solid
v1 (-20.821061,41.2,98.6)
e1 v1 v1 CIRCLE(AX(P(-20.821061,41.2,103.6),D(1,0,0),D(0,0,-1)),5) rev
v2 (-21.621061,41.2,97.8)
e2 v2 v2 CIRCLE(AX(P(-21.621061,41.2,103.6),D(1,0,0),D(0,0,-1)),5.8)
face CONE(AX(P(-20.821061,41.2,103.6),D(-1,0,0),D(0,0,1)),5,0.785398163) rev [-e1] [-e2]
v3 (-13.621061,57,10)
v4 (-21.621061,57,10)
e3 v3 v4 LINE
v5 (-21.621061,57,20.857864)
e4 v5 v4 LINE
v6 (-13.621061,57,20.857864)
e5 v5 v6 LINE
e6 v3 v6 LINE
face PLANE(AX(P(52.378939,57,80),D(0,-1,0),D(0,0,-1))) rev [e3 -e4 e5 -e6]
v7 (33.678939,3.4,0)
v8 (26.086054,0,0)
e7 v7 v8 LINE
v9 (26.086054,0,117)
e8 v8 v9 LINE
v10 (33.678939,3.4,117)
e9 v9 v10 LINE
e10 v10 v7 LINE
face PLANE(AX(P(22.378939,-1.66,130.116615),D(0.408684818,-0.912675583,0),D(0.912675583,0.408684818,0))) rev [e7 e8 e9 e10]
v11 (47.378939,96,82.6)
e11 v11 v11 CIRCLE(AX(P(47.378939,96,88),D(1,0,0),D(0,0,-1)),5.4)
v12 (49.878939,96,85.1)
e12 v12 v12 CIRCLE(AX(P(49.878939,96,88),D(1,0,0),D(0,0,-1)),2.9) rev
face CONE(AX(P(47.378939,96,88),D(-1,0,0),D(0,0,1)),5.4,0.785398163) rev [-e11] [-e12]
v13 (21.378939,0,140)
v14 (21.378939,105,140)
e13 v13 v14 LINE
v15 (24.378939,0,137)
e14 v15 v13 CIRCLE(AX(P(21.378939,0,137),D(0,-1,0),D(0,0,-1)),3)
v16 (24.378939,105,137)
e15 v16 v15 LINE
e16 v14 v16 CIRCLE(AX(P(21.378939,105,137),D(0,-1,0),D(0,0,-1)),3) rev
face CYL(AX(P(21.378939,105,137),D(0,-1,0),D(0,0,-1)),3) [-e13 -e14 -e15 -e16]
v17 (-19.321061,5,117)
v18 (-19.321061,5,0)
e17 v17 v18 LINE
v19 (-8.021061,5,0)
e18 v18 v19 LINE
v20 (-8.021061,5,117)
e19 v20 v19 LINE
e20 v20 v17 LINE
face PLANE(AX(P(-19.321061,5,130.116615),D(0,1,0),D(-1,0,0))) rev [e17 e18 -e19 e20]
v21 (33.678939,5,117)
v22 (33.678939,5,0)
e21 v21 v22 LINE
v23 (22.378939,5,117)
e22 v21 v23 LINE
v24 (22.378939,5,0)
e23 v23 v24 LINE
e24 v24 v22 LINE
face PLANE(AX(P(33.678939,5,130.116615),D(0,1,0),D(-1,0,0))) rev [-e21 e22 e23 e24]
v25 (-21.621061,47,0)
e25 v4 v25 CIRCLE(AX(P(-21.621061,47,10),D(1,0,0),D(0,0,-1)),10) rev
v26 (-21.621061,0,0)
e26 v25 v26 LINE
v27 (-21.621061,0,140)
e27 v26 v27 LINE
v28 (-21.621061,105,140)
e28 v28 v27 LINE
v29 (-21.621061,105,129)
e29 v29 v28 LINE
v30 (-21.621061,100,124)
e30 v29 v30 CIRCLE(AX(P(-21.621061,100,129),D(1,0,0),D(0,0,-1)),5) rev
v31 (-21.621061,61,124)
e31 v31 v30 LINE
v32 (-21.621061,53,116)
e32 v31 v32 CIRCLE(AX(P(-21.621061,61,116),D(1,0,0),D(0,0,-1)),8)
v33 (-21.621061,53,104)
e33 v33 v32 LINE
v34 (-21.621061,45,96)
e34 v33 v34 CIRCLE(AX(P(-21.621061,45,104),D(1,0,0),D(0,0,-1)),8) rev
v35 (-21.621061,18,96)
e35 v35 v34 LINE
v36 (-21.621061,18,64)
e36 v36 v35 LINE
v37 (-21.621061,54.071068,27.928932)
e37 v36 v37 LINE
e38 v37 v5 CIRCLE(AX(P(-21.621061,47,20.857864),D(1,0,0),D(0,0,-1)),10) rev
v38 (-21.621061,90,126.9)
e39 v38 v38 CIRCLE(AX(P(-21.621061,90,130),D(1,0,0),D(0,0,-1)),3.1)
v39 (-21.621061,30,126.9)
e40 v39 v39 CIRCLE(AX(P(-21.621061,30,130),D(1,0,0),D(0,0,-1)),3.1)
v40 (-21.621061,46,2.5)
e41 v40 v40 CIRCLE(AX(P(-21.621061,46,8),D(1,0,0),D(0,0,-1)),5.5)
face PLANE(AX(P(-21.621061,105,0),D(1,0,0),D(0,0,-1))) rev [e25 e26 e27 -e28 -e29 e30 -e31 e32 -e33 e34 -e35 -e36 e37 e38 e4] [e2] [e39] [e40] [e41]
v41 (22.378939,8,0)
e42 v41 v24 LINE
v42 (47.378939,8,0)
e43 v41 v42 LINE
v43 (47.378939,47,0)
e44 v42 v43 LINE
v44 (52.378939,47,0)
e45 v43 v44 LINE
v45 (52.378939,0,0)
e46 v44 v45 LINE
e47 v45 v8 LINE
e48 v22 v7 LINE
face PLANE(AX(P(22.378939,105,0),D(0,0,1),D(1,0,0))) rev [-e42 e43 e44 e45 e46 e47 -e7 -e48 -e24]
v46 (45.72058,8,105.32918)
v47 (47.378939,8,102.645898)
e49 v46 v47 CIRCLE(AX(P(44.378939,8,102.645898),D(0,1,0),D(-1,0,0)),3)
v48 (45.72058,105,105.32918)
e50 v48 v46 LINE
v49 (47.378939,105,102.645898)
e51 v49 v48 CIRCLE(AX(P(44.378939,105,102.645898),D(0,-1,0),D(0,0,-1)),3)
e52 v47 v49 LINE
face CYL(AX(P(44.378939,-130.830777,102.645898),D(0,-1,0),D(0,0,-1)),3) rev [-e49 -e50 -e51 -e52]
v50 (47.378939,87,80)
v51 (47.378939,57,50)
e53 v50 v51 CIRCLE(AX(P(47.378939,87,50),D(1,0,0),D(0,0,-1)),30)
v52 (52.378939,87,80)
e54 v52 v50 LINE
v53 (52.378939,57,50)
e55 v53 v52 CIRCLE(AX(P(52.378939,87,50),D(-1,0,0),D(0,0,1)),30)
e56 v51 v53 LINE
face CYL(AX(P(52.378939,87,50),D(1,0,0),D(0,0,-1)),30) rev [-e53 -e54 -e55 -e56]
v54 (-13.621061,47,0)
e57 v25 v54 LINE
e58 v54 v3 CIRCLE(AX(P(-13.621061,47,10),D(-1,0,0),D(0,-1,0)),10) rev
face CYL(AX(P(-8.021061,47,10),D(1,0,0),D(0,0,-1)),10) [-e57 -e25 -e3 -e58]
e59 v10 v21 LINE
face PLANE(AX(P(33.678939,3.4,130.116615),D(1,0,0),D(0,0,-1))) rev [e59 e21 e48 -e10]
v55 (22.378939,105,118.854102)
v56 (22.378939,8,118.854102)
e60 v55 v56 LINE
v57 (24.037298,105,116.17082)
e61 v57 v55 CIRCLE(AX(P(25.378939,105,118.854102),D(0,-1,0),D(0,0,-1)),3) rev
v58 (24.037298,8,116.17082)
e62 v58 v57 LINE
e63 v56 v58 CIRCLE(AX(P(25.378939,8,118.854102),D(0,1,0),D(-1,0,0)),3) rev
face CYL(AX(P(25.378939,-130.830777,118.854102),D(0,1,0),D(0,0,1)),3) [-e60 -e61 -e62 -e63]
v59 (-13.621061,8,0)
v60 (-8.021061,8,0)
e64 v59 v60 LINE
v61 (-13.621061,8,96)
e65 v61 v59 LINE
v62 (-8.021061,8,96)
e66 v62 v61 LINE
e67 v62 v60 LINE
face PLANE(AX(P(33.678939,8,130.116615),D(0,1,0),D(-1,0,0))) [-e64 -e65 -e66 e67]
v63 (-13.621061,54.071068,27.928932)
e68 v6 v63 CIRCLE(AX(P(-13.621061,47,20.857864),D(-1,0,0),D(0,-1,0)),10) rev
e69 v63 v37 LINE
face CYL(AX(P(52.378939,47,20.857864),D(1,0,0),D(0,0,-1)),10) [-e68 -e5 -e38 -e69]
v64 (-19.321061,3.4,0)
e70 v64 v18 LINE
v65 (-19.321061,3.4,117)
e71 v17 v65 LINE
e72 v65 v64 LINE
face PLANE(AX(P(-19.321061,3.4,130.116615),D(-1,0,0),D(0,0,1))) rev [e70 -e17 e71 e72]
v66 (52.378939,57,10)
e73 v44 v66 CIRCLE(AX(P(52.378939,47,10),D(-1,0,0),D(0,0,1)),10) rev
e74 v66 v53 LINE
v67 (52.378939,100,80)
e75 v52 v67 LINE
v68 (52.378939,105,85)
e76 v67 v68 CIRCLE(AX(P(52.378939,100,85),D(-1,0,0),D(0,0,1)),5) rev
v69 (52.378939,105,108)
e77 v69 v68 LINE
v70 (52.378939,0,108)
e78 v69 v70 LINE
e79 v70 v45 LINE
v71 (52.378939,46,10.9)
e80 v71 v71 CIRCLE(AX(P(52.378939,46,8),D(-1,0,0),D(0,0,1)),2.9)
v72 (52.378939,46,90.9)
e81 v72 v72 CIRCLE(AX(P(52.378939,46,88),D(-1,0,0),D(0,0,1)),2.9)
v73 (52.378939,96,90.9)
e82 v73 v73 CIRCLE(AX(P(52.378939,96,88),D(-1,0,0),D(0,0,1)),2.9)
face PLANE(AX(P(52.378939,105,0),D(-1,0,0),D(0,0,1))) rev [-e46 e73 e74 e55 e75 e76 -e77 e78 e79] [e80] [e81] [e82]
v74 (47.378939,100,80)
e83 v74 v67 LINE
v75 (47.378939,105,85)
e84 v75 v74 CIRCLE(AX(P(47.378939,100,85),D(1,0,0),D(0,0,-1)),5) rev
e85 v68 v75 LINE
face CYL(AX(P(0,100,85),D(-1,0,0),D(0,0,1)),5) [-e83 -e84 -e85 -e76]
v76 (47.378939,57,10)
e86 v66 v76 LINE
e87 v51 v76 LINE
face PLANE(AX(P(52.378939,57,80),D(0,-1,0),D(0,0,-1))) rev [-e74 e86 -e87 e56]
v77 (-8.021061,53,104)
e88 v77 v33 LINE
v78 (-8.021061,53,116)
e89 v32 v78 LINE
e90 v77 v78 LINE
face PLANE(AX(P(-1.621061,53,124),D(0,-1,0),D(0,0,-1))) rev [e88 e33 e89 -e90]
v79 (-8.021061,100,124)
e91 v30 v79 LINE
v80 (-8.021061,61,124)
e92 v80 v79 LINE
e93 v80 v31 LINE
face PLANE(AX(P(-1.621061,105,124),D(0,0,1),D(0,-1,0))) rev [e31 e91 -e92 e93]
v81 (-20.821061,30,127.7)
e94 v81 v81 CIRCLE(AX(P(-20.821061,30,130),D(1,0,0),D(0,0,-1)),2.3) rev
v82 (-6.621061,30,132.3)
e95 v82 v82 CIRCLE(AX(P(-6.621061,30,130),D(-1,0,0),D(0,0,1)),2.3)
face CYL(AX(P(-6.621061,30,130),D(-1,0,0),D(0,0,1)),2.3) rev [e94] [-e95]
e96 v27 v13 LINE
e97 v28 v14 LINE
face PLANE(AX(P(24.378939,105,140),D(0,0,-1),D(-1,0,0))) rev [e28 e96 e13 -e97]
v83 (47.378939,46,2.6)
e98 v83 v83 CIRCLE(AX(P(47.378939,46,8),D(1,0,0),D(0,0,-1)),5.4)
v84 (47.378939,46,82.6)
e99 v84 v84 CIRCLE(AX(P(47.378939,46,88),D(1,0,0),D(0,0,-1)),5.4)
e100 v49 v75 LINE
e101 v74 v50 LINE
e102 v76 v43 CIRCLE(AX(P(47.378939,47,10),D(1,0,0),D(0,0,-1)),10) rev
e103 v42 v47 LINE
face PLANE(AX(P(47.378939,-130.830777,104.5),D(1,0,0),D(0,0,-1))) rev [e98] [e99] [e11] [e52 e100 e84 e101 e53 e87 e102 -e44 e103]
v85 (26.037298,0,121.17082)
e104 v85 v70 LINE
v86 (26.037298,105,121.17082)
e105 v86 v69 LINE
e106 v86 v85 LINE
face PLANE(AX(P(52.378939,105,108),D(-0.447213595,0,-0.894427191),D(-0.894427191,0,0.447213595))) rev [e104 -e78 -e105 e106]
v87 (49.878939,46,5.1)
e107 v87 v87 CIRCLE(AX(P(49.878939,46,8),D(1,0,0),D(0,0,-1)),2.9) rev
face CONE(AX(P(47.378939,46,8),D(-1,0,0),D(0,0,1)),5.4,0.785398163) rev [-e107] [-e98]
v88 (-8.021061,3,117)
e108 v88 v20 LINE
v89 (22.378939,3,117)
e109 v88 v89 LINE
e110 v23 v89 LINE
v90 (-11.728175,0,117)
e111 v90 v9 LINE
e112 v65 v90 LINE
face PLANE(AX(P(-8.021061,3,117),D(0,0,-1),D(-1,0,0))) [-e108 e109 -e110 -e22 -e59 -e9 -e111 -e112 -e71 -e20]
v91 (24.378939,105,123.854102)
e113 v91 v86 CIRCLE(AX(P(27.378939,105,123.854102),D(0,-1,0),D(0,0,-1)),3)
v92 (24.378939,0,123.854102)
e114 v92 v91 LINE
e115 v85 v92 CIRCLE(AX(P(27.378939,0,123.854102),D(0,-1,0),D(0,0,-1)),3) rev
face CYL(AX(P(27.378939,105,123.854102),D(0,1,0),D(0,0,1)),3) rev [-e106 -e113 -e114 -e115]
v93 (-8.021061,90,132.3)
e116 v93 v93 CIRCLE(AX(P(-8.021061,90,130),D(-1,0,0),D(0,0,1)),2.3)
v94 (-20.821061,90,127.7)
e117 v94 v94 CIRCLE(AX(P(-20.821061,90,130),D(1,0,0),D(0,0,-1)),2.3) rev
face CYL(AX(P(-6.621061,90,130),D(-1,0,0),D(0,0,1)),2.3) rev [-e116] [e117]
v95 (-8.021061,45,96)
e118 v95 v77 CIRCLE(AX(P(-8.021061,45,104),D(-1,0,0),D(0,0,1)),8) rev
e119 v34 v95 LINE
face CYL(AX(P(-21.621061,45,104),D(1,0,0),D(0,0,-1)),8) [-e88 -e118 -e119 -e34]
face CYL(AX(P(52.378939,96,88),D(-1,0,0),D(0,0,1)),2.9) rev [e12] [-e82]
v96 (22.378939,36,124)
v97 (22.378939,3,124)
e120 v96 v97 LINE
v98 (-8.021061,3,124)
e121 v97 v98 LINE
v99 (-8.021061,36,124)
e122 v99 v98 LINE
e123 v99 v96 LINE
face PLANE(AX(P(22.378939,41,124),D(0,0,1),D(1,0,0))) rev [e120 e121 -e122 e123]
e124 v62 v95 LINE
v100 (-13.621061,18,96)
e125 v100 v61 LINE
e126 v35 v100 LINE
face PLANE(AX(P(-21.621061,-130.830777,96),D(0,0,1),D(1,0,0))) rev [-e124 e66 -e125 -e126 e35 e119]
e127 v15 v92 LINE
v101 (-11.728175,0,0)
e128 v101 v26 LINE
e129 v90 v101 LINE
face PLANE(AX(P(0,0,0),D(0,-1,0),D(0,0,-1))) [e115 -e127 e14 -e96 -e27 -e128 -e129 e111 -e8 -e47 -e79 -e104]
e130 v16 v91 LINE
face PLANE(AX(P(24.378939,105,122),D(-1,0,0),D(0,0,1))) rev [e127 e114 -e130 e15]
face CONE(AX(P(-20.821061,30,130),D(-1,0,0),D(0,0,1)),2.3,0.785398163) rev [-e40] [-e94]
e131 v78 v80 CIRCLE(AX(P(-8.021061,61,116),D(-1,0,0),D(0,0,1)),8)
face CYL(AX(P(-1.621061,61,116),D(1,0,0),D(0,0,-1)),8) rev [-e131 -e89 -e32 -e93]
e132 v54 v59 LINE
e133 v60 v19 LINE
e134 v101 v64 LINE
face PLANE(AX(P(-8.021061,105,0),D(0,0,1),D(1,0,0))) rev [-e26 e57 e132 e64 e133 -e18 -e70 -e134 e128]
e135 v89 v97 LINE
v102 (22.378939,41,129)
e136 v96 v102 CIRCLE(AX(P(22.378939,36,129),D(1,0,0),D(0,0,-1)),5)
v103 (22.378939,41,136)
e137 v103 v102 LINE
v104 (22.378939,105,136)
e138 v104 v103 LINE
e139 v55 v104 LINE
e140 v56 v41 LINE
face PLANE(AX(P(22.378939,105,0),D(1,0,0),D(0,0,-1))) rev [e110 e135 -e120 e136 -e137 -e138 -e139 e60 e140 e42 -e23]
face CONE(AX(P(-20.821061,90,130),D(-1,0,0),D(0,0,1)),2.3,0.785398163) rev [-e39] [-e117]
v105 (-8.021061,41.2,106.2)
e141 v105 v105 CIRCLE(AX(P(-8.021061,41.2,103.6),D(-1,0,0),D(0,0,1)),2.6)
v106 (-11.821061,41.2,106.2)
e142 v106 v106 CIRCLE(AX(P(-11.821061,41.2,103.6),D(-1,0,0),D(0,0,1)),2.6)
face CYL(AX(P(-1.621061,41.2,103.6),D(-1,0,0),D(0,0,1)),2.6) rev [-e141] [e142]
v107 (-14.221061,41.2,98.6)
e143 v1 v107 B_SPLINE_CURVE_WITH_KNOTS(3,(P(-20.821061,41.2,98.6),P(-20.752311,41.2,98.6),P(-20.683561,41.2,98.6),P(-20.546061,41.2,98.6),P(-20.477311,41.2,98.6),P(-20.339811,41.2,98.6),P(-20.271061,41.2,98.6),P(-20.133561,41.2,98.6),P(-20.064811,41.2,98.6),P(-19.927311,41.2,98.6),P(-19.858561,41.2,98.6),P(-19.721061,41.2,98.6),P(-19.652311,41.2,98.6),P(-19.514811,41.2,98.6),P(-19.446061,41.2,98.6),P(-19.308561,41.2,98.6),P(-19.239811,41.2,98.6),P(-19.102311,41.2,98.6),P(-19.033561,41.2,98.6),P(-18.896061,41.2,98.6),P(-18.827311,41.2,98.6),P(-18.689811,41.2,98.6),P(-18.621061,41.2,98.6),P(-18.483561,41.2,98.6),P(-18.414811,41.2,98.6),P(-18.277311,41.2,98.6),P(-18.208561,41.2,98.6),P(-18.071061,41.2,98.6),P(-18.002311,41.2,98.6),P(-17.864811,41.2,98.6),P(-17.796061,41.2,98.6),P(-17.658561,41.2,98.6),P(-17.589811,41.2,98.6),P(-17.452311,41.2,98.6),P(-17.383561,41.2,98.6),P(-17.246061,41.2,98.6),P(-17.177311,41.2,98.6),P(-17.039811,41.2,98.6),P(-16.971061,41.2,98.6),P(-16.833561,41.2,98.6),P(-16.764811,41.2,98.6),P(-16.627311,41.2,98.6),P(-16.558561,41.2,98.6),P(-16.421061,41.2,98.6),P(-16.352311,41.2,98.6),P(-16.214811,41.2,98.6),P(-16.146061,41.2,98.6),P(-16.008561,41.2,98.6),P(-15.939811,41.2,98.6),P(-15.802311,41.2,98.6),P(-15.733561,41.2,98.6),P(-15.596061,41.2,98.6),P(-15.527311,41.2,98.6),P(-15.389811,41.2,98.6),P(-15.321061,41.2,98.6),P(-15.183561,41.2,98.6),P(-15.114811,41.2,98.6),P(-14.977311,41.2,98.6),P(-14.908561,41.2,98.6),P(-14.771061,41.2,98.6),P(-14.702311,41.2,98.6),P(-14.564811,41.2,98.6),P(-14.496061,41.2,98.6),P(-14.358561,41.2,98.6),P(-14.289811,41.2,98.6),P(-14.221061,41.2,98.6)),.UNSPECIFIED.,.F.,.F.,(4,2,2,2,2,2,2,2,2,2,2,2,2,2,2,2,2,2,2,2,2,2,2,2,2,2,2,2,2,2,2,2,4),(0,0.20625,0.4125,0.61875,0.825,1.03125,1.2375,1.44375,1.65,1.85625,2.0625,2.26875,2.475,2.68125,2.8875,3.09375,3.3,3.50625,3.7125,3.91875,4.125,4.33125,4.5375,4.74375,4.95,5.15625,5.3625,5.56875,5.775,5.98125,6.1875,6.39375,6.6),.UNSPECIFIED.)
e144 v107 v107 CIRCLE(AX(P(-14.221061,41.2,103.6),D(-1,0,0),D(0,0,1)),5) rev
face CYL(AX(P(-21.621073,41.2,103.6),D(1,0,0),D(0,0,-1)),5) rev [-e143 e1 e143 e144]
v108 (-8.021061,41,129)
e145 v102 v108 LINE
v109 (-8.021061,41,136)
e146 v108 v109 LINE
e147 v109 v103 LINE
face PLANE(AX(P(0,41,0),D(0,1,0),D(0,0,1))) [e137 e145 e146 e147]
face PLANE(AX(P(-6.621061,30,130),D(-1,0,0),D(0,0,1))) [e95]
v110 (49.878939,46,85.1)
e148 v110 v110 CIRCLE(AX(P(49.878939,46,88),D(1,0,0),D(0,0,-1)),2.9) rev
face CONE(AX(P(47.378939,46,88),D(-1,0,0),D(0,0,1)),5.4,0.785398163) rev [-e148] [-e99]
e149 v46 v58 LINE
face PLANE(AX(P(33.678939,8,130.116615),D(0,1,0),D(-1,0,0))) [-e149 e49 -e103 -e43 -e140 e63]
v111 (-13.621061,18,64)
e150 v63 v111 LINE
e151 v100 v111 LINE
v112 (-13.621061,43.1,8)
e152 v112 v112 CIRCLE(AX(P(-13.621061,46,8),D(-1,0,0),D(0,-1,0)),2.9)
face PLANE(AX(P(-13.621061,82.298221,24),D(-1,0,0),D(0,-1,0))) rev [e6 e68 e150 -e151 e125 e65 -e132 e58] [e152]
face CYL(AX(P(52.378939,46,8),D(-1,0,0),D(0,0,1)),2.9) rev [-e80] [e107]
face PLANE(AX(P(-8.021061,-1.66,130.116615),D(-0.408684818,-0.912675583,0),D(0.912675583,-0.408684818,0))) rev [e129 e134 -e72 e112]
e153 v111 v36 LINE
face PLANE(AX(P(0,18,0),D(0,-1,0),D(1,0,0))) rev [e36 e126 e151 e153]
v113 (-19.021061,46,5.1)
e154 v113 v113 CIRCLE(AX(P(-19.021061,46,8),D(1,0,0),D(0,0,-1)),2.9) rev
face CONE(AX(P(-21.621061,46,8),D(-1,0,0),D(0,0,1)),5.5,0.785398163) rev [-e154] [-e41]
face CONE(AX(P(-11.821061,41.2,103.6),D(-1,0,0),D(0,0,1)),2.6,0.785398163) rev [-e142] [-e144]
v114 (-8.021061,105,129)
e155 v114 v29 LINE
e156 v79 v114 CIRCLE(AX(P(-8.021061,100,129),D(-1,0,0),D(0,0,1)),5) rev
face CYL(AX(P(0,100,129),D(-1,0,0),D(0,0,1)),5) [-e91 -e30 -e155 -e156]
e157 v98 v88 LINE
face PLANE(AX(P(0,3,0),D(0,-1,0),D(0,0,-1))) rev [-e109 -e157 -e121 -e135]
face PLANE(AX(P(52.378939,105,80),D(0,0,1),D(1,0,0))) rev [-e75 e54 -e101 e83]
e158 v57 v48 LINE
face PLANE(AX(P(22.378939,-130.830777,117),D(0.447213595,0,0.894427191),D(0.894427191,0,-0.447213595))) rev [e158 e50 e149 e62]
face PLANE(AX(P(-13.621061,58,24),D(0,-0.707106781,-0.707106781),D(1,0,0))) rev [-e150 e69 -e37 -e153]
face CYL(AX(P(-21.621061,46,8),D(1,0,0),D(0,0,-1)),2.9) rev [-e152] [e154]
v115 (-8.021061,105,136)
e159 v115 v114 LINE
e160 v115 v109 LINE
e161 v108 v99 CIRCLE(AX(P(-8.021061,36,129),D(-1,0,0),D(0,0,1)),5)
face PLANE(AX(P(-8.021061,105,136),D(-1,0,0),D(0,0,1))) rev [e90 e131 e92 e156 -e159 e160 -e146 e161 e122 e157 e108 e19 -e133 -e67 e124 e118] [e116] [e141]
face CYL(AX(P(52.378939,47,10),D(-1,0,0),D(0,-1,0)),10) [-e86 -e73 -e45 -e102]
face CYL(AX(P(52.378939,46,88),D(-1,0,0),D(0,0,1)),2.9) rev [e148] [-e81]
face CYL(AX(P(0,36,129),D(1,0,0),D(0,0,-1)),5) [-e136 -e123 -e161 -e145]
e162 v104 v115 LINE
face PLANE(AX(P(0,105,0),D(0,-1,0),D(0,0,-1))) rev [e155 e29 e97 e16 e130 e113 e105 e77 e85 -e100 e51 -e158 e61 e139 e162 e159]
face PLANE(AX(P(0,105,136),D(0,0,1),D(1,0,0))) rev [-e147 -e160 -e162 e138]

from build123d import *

# Parameters (mm, degrees)
EXTRUDE_1_DEPTH          = 105
SKETCH_7_W               = 30.4
SKETCH_7_H               = 19
EXTRUDE_2_DEPTH          = 3
SKETCH_8_W               = 30.4
SKETCH_8_H               = 12
EXTRUDE_3_DEPTH          = 38
FILLET_1_R               = 5
CUT_EXTRUDE_1_DEPTH      = 117
CUT_EXTRUDE_2_DEPTH      = 97
CUT_EXTRUDE_4_DEPTH      = 191.002631561
CUT_EXTRUDE_4_DEPTH_BACK = 6.8
SKETCH_11_R              = 5
FILLET_3_R               = 3
SKETCH_12_R              = 2.6
CUT_EXTRUDE_5_DEPTH      = 20
CHAMFER_1_SIZE           = 3
SKETCH_13_R              = 2.9
CUT_EXTRUDE_6_DEPTH      = 191.002631561
CHAMFER_3_SIZE           = 2.5
SKETCH_16_W              = 80
SKETCH_16_H              = 48
CUT_EXTRUDE_9_DEPTH      = 191.002631561
FILLET_4_R               = 30
SKETCH_17_W              = 28
SKETCH_17_H              = 52
CUT_EXTRUDE_10_DEPTH     = 20
FILLET_5_R               = 8
SKETCH_18_W              = 8
SKETCH_18_H              = 24
EXTRUDE_4_DEPTH          = 49
CHAMFER_4_SIZE           = 50
FILLET_6_R               = 10
SKETCH_19_R              = 2.9
CUT_EXTRUDE_11_DEPTH     = 191.002631561
CHAMFER_5_SIZE           = 2.6
SKETCH_21_R              = 2.3
CUT_EXTRUDE_13_DEPTH     = 15
FILLET_7_R               = 5
CHAMFER_6_SIZE           = 0.8
SKETCH_22_W              = 8
SKETCH_22_H              = 48.683816014
EXTRUDE_5_DEPTH          = 10
FILLET_8_R               = 10


with BuildPart() as part:
    # Эскиз2 → Бобышка-Вытянуть1 (new body)
    with BuildSketch(Plane(origin=(0, 0, 0), x_dir=(1, 0, 0), z_dir=(0, 1, 0))):
        Polygon((52.378939236, 0), (52.378939236, -108), (24.378939236, -122), (24.378939236, -140), (0, -140), (-21.621060764, -140), (-21.621060764, 0), (-8.021060764, 0), (-8.021060764, -136), (0, -136), (22.378939236, -136), (22.378939236, 0), align=None)
    extrude(amount=EXTRUDE_1_DEPTH)



with BuildPart() as body_2:
    # Эскиз7 → Бобышка-Вытянуть2 (new body)
    with BuildSketch(Plane.XZ):
        with Locations((7.178939236, 126.5)):
            Rectangle(SKETCH_7_W, SKETCH_7_H)
    extrude(amount=-EXTRUDE_2_DEPTH)


with BuildPart() as part_1:
    add(part.part)

    add(body_2.part)  # Бобышка-Вытянуть3 merges body 2
    # Эскиз8 → Бобышка-Вытянуть3 (add)
    with BuildSketch(Plane(origin=(0, 3, 0), x_dir=(1, 0, 0), z_dir=(0, 1, 0))):
        with Locations((7.178939236, -130)):
            Rectangle(SKETCH_8_W, SKETCH_8_H)
    extrude(amount=EXTRUDE_3_DEPTH)

    # Скругление1
    fillet_1_edges = [part_1.edges().sort_by_distance(p)[0] for p in [
        (7.178939236, 41, 124),
    ]]
    fillet(fillet_1_edges, radius=FILLET_1_R)

    # Эскиз3 → Вырез-Вытянуть1 (cut)
    with BuildSketch(Plane(origin=(0, 0, 0), x_dir=(-1, 0, 0), z_dir=(0, 0, -1))):
        Polygon((8.021060764, -1.66), (19.321060764, 3.4), (19.321060764, 5), (8.021060764, 5), align=None)
        Polygon((-33.678939236, 5), (-22.378939236, 5), (-22.378939236, -1.66), (-33.678939236, 3.4), align=None)
    extrude(amount=-CUT_EXTRUDE_1_DEPTH, mode=Mode.SUBTRACT)

    # Эскиз9 → Вырез-Вытянуть2 (cut)
    with BuildSketch(Plane(origin=(0, 105, 0), x_dir=(1, 0, 0), z_dir=(0, 1, 0))):
        Polygon((-21.621060764, 0), (-21.621060764, -96), (22.378939236, -96), (22.378939236, -117), (47.378939236, -104.5), (47.378939236, 0), align=None)
    extrude(amount=-CUT_EXTRUDE_2_DEPTH, mode=Mode.SUBTRACT)

    # Эскиз11 → Вырез-Вытянуть4 (cut, two sides: drawn at the far end of the back side and taken through both)
    with BuildSketch(Plane.ZY.offset(21.621060764).offset(-CUT_EXTRUDE_4_DEPTH_BACK)):
        with Locations(Location((103.6, 41.2, 0), (0, 0, 180))):
            Circle(SKETCH_11_R)
    extrude(amount=CUT_EXTRUDE_4_DEPTH + CUT_EXTRUDE_4_DEPTH_BACK, mode=Mode.SUBTRACT)

    # Скругление3
    fillet_3_edges = [part_1.edges().sort_by_distance(p)[0] for p in [
        (47.378939236, 56.5, 104.5),
        (22.378939236, 56.5, 117),
        (24.378939236, 52.5, 140),
        (24.378939236, 52.5, 122),
    ]]
    fillet(fillet_3_edges, radius=FILLET_3_R)

    # Эскиз12 → Вырез-Вытянуть5 (cut)
    with BuildSketch(Plane.ZY.offset(21.621060764)):
        with Locations((103.6, 41.2)):
            Circle(SKETCH_12_R)
    extrude(amount=-CUT_EXTRUDE_5_DEPTH, mode=Mode.SUBTRACT)

    # Фаска1
    # the kernel refuses this chamfer: 3 mm, written as the material it takes off along each edge
    with BuildSketch(Plane(origin=(-14.821060764, 41.2, 103.6), x_dir=(0, 0, 1), z_dir=(0, -1, 0))) as chamfer_1_piece_1_section:
        Polygon((2.6, -CHAMFER_1_SIZE), (2.6 + CHAMFER_1_SIZE, 0), (2.6, 0), align=None)
    chamfer_1_piece_1 = revolve(axis=Axis((-14.821060764, 41.2, 103.6), (-1, 0, 0)), mode=Mode.PRIVATE)
    chamfer_1_piece_1 = chamfer_1_piece_1 & Plane(origin=(-13.01179882, 41.2, 103.6), x_dir=(0, 0, -1), z_dir=(-1, 0, 0)) * Cylinder(5, 23, mode=Mode.PRIVATE)
    add(chamfer_1_piece_1, mode=Mode.SUBTRACT)

    # Эскиз13 → Вырез-Вытянуть6 (cut, through all)
    with BuildSketch(Plane.ZY.offset(21.621060764)):
        with Locations((88, 46)):
            Circle(SKETCH_13_R)
        with Locations((8, 46)):
            Circle(SKETCH_13_R)
        with Locations((88, 96)):
            Circle(SKETCH_13_R)
    extrude(amount=-CUT_EXTRUDE_6_DEPTH, mode=Mode.SUBTRACT)

    # Фаска3
    chamfer_3_edges = [part_1.edges().sort_by_distance(p)[0] for p in [
        (47.378939236, 96, 85.1),
        (47.378939236, 46, 5.1),
        (47.378939236, 46, 85.1),
    ]]
    chamfer(chamfer_3_edges, length=CHAMFER_3_SIZE)

    # Эскиз16 → Вырез-Вытянуть9 (cut, through all)
    with BuildSketch(Plane.ZY.offset(21.621060764)):
        with Locations((40, 81)):
            Rectangle(SKETCH_16_W, SKETCH_16_H)
    extrude(amount=-CUT_EXTRUDE_9_DEPTH, mode=Mode.SUBTRACT)

    # Скругление4
    fillet_4_edges = [part_1.edges().sort_by_distance(p)[0] for p in [
        (49.878939236, 57, 80),
    ]]
    fillet(fillet_4_edges, radius=FILLET_4_R)

    # Эскиз17 → Вырез-Вытянуть10 (cut)
    with BuildSketch(Plane.ZY.offset(21.621060764)):
        with Locations((110, 79)):
            Rectangle(SKETCH_17_W, SKETCH_17_H)
    extrude(amount=-CUT_EXTRUDE_10_DEPTH, mode=Mode.SUBTRACT)

    # Скругление5
    fillet_5_edges = [part_1.edges().sort_by_distance(p)[0] for p in [
        (-14.821060764, 53, 96),
        (-14.821060764, 53, 124),
    ]]
    fillet(fillet_5_edges, radius=FILLET_5_R)

    # Эскиз18 → Бобышка-Вытянуть4 (add)
    with BuildSketch(Plane(origin=(0, 8, 0), x_dir=(1, 0, 0), z_dir=(0, 1, 0))):
        with Locations((-17.621060764, -12)):
            Rectangle(SKETCH_18_W, SKETCH_18_H)
    extrude(amount=EXTRUDE_4_DEPTH)

    # Фаска4
    # the kernel refuses this chamfer: 50 mm, written as the material it adds along each edge
    with BuildSketch(Plane(origin=(-13.621060764, 8, 24), x_dir=(0, 0.9996219169112966, -0.027495876610586386), z_dir=(-1, 0, 0))) as chamfer_4_piece_1_section:
        Polygon((CHAMFER_4_SIZE * 0.999621916911, -CHAMFER_4_SIZE * 0.0274958766106), (-CHAMFER_4_SIZE * 0.0274958766106, -CHAMFER_4_SIZE * 0.999621916911), (0, 0), align=None)
    chamfer_4_piece_1 = extrude(amount=8, mode=Mode.PRIVATE)
    chamfer_4_piece_1 = split(chamfer_4_piece_1, bisect_by=Plane(origin=(-17.621060764, 57, 40.555220818), z_dir=(0, -1, 0)), keep=Keep.TOP, mode=Mode.PRIVATE)
    add(chamfer_4_piece_1)

    # Скругление6
    fillet_6_edges = [part_1.edges().sort_by_distance(p)[0] for p in [
        (49.878939236, 57, 0),
        (-17.621060764, 57, 0),
    ]]
    fillet(fillet_6_edges, radius=FILLET_6_R)

    # Эскиз19 → Вырез-Вытянуть11 (cut, through all)
    with BuildSketch(Plane(origin=(52.378939236, 0, 0), x_dir=(0, 0, -1), z_dir=(1, 0, 0))):
        with Locations(Location((-8, 46, 0), (0, 0, 180))):
            Circle(SKETCH_19_R)
    extrude(amount=-CUT_EXTRUDE_11_DEPTH, mode=Mode.SUBTRACT)

    # Фаска5
    chamfer_5_edges = [part_1.edges().sort_by_distance(p)[0] for p in [
        (-21.621060764, 46, 5.1),
    ]]
    chamfer(chamfer_5_edges, length=CHAMFER_5_SIZE)

    # Эскиз21 → Вырез-Вытянуть13 (cut)
    with BuildSketch(Plane.ZY.offset(21.621060764)):
        with Locations((130, 30)):
            Circle(SKETCH_21_R)
        with Locations((130, 90)):
            Circle(SKETCH_21_R)
    extrude(amount=-CUT_EXTRUDE_13_DEPTH, mode=Mode.SUBTRACT)

    # Скругление7
    fillet_7_edges = [part_1.edges().sort_by_distance(p)[0] for p in [
        (49.878939236, 105, 80),
        (-14.821060764, 105, 124),
    ]]
    fillet(fillet_7_edges, radius=FILLET_7_R)

    # Фаска6
    chamfer_6_edges = [part_1.edges().sort_by_distance(p)[0] for p in [
        (-21.621060764, 41.2, 108.6),
        (-21.621060764, 30, 127.7),
        (-21.621060764, 90, 127.7),
    ]]
    chamfer(chamfer_6_edges, length=CHAMFER_6_SIZE)

    # Эскиз22 → Бобышка-Вытянуть5 (add)
    with BuildSketch(Plane(origin=(0, 8, 0), x_dir=(1, 0, 0), z_dir=(0, 1, 0))):
        with Locations((-17.621060764, -71.658091993)):
            Rectangle(SKETCH_22_W, SKETCH_22_H)
    extrude(amount=EXTRUDE_5_DEPTH)

    # Скругление8
    fillet_8_edges = [part_1.edges().sort_by_distance(p)[0] for p in [
        (-17.621060764, 57, 25),
    ]]
    fillet(fillet_8_edges, radius=FILLET_8_R)


solid = part_1.part
